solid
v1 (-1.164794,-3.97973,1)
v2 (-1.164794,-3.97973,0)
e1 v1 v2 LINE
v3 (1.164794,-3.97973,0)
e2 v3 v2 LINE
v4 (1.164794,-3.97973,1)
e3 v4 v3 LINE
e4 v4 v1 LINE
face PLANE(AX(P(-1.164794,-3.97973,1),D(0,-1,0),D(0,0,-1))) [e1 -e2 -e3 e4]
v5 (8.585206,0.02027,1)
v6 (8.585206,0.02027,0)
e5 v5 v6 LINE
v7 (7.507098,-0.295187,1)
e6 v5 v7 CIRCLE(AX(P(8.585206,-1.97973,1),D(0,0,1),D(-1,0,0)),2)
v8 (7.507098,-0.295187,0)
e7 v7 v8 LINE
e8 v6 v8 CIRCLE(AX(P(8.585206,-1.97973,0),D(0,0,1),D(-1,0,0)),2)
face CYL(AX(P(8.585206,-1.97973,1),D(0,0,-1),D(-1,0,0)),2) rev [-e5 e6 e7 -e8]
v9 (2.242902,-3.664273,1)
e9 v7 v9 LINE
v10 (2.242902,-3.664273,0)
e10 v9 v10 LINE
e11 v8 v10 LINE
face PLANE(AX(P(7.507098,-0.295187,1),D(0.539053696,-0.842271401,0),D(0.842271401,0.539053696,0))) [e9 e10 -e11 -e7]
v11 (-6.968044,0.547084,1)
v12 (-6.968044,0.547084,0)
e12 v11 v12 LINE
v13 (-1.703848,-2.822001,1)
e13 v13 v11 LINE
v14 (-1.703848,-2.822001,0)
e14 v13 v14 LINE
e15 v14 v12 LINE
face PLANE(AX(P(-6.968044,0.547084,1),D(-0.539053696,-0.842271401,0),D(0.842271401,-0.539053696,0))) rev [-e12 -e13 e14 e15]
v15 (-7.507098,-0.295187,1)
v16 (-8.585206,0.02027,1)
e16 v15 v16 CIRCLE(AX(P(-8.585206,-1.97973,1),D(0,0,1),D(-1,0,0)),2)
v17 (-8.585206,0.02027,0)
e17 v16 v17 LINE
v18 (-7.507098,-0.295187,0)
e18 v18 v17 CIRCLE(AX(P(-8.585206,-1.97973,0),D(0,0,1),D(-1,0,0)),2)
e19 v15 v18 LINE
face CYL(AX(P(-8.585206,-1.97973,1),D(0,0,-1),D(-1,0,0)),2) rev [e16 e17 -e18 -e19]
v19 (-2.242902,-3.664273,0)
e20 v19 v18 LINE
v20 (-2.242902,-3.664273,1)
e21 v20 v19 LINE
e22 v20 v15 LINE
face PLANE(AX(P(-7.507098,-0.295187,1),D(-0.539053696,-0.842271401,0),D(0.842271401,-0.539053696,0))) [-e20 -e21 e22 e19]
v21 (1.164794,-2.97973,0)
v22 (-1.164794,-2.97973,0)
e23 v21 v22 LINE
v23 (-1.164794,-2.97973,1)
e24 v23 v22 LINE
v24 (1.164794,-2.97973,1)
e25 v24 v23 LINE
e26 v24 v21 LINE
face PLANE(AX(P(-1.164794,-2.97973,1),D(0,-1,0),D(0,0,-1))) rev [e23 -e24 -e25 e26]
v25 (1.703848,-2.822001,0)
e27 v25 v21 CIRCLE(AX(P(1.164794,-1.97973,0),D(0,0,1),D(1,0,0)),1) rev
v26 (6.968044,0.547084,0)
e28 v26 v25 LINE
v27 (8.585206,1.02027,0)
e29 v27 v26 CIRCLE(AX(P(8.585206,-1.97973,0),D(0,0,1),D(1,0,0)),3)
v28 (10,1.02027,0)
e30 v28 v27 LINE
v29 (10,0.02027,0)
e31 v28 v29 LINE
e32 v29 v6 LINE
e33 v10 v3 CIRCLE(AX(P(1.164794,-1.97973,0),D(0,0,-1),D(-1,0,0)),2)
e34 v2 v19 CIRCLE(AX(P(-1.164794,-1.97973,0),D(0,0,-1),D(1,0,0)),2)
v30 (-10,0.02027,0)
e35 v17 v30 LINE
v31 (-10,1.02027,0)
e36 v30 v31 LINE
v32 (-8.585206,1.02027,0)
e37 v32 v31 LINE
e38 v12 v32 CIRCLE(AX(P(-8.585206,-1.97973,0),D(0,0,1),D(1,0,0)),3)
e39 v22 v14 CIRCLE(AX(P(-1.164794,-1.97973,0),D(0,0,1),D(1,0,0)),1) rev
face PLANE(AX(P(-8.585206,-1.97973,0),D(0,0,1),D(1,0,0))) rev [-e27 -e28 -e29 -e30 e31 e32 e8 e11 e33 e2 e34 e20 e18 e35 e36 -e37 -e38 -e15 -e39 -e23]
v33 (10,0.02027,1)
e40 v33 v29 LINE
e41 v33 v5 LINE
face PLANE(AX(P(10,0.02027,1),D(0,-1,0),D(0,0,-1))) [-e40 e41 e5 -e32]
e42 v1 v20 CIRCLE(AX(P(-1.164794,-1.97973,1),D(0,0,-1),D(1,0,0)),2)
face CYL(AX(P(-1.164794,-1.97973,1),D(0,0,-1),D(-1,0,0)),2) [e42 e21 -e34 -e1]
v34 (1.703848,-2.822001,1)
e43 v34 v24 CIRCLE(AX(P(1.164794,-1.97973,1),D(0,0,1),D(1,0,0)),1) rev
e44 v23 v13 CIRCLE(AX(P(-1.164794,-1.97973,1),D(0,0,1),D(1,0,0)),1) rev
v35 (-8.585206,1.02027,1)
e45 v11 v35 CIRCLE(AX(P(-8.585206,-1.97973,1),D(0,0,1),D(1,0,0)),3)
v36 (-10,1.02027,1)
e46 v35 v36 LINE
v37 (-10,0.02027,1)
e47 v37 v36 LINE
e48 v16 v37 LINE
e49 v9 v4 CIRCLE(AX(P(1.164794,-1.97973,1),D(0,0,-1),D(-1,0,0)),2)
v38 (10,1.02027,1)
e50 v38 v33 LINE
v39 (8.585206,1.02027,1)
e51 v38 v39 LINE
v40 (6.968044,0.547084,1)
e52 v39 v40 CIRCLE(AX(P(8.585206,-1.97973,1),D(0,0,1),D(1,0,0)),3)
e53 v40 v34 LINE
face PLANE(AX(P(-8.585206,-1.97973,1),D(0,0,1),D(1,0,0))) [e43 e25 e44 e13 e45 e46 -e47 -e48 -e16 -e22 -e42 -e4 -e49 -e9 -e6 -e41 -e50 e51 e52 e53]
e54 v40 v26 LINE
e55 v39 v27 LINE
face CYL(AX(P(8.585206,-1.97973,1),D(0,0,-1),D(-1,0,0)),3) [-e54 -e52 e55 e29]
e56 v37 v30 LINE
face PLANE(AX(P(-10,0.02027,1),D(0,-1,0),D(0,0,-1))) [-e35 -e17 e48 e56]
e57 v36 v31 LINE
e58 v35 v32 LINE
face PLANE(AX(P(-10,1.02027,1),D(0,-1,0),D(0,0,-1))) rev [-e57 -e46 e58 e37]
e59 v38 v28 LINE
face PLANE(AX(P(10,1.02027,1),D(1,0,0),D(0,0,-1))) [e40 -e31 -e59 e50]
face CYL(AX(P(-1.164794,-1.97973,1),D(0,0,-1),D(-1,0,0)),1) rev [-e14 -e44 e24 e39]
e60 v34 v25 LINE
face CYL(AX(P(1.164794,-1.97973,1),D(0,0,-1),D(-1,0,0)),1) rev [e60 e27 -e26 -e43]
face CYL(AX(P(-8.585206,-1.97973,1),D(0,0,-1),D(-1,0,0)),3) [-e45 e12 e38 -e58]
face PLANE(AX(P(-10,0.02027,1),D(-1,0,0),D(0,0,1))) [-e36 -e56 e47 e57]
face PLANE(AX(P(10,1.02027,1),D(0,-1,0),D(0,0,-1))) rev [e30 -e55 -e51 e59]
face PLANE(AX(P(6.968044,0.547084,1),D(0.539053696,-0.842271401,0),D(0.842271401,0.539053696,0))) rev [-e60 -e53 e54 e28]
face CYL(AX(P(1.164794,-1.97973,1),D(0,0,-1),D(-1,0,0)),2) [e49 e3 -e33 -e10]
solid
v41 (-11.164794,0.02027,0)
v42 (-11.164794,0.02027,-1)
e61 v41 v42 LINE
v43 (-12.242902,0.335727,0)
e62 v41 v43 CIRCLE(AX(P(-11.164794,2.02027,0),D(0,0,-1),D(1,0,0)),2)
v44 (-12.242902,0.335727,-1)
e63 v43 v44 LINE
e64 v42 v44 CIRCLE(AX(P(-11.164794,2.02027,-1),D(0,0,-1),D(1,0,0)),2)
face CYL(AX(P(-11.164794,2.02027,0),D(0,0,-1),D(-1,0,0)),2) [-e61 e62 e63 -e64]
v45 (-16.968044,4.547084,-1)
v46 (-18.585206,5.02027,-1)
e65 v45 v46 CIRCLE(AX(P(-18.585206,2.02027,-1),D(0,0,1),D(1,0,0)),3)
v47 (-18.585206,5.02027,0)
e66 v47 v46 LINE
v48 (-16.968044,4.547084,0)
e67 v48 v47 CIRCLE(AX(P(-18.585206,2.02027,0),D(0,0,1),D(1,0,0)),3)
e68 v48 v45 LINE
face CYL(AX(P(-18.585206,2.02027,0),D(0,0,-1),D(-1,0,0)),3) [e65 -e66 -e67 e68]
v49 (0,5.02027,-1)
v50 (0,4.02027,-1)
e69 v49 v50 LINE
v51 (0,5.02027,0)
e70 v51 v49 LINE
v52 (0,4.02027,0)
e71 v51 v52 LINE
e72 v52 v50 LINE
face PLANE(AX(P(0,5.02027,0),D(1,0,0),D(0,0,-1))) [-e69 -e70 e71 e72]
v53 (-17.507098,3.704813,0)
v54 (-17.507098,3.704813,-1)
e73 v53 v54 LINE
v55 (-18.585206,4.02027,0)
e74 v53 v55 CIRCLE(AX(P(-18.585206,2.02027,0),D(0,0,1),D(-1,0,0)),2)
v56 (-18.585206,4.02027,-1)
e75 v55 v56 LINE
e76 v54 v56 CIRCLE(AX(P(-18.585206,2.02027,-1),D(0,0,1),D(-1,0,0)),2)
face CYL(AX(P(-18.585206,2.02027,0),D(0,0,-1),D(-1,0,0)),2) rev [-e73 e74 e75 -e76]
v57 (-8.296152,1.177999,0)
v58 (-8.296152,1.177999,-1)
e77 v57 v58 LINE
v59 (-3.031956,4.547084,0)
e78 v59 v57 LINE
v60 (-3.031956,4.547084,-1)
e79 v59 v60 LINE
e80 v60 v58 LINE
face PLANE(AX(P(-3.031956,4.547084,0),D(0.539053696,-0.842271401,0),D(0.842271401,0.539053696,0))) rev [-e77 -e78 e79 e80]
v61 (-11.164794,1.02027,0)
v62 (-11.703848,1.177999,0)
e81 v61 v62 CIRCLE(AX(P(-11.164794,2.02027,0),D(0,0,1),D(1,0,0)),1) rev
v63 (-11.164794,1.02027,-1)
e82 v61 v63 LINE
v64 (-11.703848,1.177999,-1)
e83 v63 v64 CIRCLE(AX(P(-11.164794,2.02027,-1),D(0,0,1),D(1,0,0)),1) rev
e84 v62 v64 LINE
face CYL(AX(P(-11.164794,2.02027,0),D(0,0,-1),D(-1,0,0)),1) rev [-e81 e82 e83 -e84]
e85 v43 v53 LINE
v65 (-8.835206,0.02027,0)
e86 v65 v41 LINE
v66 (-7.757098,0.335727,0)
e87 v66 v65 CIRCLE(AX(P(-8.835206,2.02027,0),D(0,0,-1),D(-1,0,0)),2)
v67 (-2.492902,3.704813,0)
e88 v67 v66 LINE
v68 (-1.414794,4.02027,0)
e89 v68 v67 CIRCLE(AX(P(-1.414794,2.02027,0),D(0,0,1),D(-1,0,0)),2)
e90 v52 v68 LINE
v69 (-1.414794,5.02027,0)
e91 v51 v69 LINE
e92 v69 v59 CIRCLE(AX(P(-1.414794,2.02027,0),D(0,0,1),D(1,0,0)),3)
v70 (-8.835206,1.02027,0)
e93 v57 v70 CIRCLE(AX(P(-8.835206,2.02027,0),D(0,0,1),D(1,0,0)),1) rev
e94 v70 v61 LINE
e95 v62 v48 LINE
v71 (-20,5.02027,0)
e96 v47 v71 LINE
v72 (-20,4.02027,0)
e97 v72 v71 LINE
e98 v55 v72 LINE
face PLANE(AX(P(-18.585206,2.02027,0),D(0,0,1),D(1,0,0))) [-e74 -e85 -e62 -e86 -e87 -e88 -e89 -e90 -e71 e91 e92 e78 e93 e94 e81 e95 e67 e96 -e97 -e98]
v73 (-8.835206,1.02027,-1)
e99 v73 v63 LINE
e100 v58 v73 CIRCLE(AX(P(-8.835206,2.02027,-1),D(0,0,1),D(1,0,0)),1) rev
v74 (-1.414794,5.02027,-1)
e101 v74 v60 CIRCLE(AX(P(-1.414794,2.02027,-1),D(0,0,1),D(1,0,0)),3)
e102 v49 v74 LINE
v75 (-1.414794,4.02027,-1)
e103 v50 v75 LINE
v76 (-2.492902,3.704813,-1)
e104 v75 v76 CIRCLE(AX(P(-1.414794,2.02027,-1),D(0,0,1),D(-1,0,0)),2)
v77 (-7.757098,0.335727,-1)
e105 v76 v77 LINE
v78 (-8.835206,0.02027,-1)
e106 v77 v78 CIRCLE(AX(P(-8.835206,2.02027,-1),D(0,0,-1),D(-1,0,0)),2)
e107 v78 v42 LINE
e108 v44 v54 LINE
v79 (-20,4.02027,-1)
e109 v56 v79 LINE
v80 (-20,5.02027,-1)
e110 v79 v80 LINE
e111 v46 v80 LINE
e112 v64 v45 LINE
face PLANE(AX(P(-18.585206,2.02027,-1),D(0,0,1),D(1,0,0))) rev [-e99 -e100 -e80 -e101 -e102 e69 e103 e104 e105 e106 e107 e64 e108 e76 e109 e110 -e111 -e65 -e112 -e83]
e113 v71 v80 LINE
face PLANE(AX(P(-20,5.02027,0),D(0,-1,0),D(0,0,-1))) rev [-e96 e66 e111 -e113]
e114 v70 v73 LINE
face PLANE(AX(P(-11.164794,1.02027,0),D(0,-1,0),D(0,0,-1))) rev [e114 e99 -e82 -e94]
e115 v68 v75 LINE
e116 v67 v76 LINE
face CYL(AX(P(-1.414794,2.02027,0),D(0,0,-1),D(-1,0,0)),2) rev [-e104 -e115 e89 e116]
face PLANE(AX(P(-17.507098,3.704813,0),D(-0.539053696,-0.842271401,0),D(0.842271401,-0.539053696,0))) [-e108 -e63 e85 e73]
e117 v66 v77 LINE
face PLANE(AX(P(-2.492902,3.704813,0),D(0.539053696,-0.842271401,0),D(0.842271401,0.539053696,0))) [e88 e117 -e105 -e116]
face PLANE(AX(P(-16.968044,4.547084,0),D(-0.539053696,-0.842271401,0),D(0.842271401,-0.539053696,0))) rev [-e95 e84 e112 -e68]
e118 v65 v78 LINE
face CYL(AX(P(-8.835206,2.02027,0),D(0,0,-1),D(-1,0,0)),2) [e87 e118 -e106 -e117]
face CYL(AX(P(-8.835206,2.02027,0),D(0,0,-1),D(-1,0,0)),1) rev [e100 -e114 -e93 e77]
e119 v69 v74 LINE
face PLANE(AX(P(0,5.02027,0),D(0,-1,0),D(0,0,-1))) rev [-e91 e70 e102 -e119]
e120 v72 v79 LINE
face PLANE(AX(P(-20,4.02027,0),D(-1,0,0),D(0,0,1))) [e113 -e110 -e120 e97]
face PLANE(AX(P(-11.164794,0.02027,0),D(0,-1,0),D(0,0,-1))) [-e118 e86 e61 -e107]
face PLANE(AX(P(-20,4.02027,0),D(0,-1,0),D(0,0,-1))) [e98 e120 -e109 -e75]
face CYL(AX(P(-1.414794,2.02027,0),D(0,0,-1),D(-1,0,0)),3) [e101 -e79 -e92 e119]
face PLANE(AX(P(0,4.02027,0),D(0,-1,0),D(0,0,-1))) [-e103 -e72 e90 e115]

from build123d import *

# Parameters (mm, degrees)
EXTRUDE_THIN2_DEPTH   = 1
SKETCH_PATTERN3_DEPTH = 1


# Read off the part's stored shape, not the designer's step: Sketch-Pattern3
with BuildPart() as part:
    # Sketch1 → Extrude-Thin2 (new body)
    with BuildSketch(Plane.XY):
        with BuildLine():
            Line((-10, 0.02027027), (-8.58520552, 0.02027027))
            ThreePointArc((-8.58520552, 0.02027027), (-8.023549755, -0.060213436), (-7.507098127, -0.295186928))
            Line((-7.507098127, -0.295186928), (-2.242901873, -3.664272531))
            ThreePointArc((-2.242901873, -3.664272531), (-1.726450245, -3.899246023), (-1.16479448, -3.97972973))
            Line((-1.16479448, -3.97972973), (1.16479448, -3.97972973))
            ThreePointArc((1.16479448, -3.97972973), (1.726450245, -3.899246023), (2.242901873, -3.664272531))
            Line((2.242901873, -3.664272531), (7.507098127, -0.295186928))
            ThreePointArc((7.507098127, -0.295186928), (8.023549755, -0.060213436), (8.58520552, 0.02027027))
            Line((8.58520552, 0.02027027), (10, 0.02027027))
            Line((10, 0.02027027), (10, 1.02027027))
            Line((10, 1.02027027), (8.58520552, 1.02027027))
            ThreePointArc((8.58520552, 1.02027027), (7.742721872, 0.899544711), (6.968044431, 0.547084472))
            Line((6.968044431, 0.547084472), (1.703848177, -2.82200113))
            ThreePointArc((1.703848177, -2.82200113), (1.445622363, -2.939487877), (1.16479448, -2.97972973))
            Line((1.16479448, -2.97972973), (-1.16479448, -2.97972973))
            ThreePointArc((-1.16479448, -2.97972973), (-1.445622363, -2.939487877), (-1.703848177, -2.82200113))
            Line((-1.703848177, -2.82200113), (-6.968044431, 0.547084472))
            ThreePointArc((-6.968044431, 0.547084472), (-7.742721872, 0.899544711), (-8.58520552, 1.02027027))
            Line((-8.58520552, 1.02027027), (-10, 1.02027027))
            Line((-10, 1.02027027), (-10, 0.02027027))
        make_face()
    extrude(amount=EXTRUDE_THIN2_DEPTH)


with BuildPart() as body_2:
    # Sketch-Pattern3 outline → Sketch-Pattern3 (new body)
    with BuildSketch(Plane.XY):
        with BuildLine():
            Line((-8.83520552, 1.02027027), (-11.16479448, 1.02027027))
            ThreePointArc((-11.16479448, 1.02027027), (-11.445622363, 1.060512123), (-11.703848177, 1.17799887))
            Line((-11.703848177, 1.17799887), (-16.968044431, 4.547084472))
            ThreePointArc((-16.968044431, 4.547084472), (-17.742721872, 4.899544711), (-18.58520552, 5.02027027))
            Line((-18.58520552, 5.02027027), (-20, 5.02027027))
            Line((-20, 5.02027027), (-20, 4.02027027))
            Line((-20, 4.02027027), (-18.58520552, 4.02027027))
            ThreePointArc((-18.58520552, 4.02027027), (-18.023549755, 3.939786564), (-17.507098127, 3.704813072))
            Line((-17.507098127, 3.704813072), (-12.242901873, 0.335727469))
            ThreePointArc((-12.242901873, 0.335727469), (-11.726450245, 0.100753977), (-11.16479448, 0.02027027))
            Line((-11.16479448, 0.02027027), (-8.83520552, 0.02027027))
            ThreePointArc((-8.83520552, 0.02027027), (-8.273549755, 0.100753977), (-7.757098127, 0.335727469))
            Line((-7.757098127, 0.335727469), (-2.492901873, 3.704813072))
            ThreePointArc((-2.492901873, 3.704813072), (-1.976450245, 3.939786564), (-1.41479448, 4.02027027))
            Line((-1.41479448, 4.02027027), (0, 4.02027027))
            Line((0, 4.02027027), (0, 5.02027027))
            Line((0, 5.02027027), (-1.41479448, 5.02027027))
            ThreePointArc((-1.41479448, 5.02027027), (-2.257278128, 4.899544711), (-3.031955569, 4.547084472))
            Line((-3.031955569, 4.547084472), (-8.296151823, 1.17799887))
            ThreePointArc((-8.296151823, 1.17799887), (-8.554377637, 1.060512123), (-8.83520552, 1.02027027))
        make_face()
    extrude(amount=SKETCH_PATTERN3_DEPTH)


with BuildPart() as body_2_1:
    # Body-Move/Copy1: moved
    add(body_2.part.moved(Location((0, 0, -1))))


solid = Compound([part.part, body_2_1.part])
